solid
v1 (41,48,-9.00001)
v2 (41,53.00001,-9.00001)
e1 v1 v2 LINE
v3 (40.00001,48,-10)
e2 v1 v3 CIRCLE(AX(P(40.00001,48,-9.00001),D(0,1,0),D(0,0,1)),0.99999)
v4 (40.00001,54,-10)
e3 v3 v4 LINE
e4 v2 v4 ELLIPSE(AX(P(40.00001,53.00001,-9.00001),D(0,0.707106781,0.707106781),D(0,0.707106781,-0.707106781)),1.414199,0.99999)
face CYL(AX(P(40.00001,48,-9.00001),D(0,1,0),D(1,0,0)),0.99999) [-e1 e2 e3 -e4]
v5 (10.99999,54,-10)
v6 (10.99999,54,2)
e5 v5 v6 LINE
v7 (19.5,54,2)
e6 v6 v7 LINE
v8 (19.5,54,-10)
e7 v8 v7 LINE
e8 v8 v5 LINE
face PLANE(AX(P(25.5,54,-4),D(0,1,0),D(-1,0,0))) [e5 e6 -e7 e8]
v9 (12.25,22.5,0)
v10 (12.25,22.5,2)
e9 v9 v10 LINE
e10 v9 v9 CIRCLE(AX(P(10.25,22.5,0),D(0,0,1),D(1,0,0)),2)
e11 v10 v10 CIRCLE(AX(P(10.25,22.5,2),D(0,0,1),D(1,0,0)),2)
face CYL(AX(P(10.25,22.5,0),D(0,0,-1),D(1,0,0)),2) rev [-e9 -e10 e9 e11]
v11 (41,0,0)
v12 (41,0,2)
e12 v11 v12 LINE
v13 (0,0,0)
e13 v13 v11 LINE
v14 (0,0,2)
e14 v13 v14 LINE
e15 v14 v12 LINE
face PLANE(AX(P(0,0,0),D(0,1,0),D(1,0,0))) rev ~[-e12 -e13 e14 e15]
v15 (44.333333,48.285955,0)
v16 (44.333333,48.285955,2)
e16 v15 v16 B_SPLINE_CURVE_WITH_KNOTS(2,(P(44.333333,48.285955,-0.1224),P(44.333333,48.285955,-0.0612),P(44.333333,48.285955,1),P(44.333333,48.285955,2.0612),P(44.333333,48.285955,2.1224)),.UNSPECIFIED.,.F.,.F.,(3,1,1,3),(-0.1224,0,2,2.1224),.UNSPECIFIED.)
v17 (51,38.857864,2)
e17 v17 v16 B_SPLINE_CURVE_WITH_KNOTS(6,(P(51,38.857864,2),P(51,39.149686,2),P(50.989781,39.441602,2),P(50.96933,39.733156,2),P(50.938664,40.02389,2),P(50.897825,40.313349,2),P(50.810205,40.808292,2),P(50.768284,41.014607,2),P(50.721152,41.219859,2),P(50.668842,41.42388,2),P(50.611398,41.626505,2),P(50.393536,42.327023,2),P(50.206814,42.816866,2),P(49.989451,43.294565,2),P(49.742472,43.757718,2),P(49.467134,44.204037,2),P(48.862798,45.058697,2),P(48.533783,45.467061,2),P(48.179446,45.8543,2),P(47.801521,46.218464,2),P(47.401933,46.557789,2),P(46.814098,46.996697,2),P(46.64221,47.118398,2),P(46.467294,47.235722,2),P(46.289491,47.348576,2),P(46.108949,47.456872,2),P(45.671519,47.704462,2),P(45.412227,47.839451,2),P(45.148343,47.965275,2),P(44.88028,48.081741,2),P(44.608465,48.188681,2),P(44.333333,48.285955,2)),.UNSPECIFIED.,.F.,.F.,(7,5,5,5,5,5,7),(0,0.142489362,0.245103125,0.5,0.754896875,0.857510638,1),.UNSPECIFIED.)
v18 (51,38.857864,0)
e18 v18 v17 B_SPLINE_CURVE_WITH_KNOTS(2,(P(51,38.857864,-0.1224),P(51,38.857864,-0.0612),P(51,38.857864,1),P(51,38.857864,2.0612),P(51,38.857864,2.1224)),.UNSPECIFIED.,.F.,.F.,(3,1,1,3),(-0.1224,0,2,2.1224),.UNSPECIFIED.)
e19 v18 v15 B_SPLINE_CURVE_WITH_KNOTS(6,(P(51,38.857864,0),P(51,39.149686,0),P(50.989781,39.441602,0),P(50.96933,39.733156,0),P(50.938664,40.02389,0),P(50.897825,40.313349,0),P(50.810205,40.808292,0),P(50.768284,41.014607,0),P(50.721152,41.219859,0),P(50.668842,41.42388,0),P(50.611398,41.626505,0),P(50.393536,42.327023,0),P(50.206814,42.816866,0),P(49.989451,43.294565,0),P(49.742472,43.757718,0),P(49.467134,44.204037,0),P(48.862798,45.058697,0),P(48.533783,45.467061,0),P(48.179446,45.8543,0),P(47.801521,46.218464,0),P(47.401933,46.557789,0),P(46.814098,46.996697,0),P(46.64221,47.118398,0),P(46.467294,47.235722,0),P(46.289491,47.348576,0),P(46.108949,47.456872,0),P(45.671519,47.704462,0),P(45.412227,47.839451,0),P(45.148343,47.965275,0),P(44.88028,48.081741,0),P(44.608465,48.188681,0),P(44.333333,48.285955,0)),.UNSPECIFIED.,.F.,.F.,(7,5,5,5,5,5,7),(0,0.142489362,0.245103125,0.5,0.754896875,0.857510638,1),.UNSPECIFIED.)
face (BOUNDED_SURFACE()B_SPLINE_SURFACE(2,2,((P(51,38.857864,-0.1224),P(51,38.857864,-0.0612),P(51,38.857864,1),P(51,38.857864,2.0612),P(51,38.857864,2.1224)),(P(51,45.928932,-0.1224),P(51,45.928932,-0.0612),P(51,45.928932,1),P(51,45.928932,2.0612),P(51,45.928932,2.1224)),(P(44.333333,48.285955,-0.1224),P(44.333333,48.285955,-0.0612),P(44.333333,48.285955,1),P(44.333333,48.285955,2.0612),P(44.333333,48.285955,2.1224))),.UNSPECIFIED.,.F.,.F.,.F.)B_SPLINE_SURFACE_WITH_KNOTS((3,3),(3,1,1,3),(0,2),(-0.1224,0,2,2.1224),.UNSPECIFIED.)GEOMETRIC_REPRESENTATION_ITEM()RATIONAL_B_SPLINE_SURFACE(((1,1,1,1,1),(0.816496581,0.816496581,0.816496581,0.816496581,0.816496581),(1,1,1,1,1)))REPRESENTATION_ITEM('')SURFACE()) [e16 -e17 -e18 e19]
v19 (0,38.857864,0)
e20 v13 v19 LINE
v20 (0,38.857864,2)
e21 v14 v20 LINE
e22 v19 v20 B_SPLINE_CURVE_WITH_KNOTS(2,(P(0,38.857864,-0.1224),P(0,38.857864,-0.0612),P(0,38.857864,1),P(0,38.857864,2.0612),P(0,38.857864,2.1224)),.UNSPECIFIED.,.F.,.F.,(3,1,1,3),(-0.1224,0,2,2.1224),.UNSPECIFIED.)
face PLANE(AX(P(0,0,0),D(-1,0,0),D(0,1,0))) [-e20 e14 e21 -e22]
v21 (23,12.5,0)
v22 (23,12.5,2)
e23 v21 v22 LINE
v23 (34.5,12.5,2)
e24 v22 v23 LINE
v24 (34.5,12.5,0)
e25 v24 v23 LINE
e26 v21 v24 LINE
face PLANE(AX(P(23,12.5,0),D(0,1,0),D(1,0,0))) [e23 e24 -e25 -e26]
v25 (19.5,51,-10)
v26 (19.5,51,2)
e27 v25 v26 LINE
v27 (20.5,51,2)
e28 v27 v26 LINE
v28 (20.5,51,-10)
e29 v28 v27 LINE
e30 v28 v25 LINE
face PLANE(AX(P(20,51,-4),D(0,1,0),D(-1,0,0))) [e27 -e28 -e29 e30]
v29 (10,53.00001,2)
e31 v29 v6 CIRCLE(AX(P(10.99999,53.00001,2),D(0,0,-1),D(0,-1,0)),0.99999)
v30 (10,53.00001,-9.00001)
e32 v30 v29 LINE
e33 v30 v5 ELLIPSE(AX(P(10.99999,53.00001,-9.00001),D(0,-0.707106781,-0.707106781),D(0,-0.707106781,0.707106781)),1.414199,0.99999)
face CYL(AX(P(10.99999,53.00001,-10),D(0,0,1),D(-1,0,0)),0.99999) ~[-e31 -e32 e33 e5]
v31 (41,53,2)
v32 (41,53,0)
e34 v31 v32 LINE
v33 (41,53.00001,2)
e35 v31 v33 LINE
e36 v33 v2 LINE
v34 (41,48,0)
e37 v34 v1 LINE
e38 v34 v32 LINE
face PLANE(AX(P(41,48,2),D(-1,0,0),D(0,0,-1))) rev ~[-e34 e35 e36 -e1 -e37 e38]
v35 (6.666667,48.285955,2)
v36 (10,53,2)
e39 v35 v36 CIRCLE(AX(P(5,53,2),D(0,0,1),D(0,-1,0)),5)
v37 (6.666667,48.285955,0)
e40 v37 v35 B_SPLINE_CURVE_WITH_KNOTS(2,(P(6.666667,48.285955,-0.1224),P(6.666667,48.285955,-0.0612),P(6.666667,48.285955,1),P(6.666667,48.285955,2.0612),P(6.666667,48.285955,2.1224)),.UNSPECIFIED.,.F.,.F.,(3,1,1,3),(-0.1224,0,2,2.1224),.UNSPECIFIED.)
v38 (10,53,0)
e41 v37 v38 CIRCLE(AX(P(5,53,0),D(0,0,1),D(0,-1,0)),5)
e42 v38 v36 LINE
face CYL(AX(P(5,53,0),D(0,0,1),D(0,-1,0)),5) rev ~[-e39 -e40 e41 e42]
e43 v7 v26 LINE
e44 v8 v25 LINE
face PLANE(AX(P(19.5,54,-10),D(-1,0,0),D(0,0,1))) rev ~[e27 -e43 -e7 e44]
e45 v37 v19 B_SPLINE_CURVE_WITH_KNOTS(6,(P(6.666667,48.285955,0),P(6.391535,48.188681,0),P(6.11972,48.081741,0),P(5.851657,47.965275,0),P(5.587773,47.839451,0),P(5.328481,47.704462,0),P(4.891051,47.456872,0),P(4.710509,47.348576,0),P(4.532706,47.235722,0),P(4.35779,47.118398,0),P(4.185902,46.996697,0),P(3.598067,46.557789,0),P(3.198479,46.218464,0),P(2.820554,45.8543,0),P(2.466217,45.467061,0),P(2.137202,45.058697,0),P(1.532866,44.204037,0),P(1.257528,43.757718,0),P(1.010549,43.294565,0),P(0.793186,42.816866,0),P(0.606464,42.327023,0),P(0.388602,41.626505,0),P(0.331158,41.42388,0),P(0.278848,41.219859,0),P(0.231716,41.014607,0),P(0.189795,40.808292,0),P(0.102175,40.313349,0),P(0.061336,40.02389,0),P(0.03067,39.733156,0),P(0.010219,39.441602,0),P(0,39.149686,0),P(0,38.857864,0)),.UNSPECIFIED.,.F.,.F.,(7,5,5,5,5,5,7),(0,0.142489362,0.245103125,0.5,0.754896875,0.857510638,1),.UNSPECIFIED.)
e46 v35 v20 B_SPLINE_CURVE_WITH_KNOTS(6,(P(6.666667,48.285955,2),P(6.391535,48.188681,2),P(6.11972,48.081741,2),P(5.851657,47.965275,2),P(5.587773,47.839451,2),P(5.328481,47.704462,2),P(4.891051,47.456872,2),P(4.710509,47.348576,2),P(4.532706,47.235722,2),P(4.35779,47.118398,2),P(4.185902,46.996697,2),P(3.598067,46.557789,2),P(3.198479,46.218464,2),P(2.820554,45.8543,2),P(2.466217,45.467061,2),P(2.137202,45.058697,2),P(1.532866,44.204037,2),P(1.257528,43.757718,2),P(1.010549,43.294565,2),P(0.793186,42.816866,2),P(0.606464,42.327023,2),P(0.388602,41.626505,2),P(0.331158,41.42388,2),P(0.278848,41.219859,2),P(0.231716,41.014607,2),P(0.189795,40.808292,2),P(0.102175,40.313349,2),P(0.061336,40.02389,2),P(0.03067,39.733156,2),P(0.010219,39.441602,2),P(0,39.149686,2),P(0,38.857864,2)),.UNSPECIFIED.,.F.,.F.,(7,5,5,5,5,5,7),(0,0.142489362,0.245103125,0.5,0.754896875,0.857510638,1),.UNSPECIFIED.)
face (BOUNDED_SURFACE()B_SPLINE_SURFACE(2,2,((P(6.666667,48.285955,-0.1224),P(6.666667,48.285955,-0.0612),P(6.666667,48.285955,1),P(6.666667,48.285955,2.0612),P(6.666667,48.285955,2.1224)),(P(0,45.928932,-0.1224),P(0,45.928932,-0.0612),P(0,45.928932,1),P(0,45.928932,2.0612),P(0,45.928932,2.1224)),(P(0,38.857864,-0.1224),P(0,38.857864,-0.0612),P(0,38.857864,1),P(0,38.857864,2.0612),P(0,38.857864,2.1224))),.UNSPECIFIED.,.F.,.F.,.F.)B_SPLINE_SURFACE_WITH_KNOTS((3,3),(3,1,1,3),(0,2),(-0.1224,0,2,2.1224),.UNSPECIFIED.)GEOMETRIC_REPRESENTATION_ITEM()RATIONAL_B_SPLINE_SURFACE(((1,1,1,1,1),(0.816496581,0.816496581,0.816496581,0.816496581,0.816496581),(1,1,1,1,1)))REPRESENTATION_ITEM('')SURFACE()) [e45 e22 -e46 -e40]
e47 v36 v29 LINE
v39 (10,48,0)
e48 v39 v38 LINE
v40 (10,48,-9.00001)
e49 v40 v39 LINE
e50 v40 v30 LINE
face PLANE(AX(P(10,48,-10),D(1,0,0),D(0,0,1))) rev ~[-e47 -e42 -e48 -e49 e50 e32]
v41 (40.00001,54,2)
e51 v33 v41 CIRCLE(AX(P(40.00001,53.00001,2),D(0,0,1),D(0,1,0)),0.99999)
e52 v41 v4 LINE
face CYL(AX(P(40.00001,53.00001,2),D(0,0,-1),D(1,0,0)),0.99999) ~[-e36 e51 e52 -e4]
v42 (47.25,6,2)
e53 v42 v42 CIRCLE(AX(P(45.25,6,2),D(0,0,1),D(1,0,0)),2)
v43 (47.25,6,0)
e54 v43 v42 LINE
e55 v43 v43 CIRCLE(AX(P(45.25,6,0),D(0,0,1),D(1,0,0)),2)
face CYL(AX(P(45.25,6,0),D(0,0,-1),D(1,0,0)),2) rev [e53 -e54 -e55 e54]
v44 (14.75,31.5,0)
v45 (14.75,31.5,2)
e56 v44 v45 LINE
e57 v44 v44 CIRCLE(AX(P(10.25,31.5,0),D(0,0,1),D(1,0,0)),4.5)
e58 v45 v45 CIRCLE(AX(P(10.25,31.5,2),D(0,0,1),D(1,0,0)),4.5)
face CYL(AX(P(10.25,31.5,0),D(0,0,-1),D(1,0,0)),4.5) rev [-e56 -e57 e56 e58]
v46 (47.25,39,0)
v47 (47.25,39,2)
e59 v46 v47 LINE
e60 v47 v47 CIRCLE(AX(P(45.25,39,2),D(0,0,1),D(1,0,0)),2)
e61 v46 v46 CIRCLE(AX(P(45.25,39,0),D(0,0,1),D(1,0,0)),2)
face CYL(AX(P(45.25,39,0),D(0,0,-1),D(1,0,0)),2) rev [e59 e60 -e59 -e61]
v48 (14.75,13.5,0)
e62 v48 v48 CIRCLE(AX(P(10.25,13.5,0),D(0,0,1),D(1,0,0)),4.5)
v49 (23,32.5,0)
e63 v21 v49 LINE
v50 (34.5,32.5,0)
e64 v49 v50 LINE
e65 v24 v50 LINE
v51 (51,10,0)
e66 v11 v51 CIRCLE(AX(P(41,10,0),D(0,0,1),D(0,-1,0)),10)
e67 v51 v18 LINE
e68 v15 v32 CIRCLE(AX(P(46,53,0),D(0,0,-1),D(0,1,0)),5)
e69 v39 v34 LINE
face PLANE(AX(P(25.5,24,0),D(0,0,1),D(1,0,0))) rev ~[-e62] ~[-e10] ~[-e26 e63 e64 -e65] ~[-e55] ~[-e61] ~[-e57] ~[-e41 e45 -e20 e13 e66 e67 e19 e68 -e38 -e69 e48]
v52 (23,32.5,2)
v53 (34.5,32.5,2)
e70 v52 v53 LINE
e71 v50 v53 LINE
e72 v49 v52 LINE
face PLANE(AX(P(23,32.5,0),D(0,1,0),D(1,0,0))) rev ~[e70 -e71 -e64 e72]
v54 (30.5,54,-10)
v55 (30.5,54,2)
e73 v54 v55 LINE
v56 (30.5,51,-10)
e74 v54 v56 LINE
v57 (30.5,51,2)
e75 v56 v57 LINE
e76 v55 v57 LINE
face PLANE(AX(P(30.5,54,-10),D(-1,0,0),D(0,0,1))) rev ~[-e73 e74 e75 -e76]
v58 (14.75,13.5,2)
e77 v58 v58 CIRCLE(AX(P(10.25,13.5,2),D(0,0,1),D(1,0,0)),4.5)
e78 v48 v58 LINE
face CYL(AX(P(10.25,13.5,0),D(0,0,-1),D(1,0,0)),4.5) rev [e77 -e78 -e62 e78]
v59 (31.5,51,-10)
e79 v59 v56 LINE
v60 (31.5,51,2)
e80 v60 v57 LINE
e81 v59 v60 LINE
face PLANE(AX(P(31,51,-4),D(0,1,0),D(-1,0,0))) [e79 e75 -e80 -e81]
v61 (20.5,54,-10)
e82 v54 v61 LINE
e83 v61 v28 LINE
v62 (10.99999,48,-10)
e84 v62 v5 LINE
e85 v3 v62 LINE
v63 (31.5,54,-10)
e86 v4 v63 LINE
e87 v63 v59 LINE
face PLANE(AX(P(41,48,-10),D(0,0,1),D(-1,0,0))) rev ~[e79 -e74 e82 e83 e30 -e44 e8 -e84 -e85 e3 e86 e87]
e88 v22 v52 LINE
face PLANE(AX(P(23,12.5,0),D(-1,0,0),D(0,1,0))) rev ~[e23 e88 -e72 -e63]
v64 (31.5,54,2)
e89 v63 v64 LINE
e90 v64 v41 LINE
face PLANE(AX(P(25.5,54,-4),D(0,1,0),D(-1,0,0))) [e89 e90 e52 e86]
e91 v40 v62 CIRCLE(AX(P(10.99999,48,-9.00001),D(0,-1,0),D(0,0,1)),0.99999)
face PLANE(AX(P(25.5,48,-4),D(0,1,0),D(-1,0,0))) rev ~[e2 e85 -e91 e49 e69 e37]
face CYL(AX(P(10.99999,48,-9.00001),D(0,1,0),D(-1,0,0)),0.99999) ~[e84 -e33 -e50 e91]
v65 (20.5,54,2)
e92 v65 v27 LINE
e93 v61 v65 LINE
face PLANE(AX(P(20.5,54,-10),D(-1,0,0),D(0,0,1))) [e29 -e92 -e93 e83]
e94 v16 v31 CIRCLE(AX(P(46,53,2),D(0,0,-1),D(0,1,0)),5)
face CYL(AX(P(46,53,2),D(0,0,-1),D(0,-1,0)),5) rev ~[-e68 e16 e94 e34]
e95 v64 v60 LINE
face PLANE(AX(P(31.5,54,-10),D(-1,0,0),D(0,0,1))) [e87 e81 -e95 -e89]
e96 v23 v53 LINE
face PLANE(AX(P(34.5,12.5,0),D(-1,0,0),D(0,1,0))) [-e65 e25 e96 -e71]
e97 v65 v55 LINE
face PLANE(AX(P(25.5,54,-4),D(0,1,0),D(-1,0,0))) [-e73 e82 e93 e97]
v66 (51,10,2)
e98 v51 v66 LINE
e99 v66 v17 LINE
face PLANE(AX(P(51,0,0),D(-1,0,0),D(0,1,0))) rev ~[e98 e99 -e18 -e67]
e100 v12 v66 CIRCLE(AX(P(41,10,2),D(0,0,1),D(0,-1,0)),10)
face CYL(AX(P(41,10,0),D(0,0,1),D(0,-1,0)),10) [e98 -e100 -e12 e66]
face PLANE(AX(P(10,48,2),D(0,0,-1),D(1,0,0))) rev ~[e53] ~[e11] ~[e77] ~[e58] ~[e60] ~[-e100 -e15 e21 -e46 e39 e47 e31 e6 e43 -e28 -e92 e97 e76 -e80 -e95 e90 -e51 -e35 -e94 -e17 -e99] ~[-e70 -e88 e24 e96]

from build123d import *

# Parameters (mm, degrees)
F0_W     = 51
F0_H     = 48
F0_R     = 4.5
F0_R_2   = 2
F0_W_2   = 11.5
F0_H_2   = 20
F1_DEPTH = 2
F3_DEPTH = 6
F4_W     = 1
F4_H     = 12
F5_DEPTH = 3
F6_R     = 5
F7_R     = 0.99999
F8_R     = 10


# Not quite as in the source:
# - a fillet or chamfer is up to 0.001 mm smaller than in the source, because OpenCascade refuses the exact size


with BuildPart() as f1:
    # F0 (on Top) → F1 (new body)
    with BuildSketch(Plane.XY):
        with Locations((25.5, 24)):
            Rectangle(F0_W, F0_H)
        with Locations((10.25, 13.5)):
            Circle(F0_R, mode=Mode.SUBTRACT)
        with Locations((10.25, 22.5)):
            Circle(F0_R_2, mode=Mode.SUBTRACT)
        with Locations((45.25, 6)):
            Circle(F0_R_2, mode=Mode.SUBTRACT)
        with Locations((28.75, 22.5)):
            Rectangle(F0_W_2, F0_H_2, mode=Mode.SUBTRACT)
        with Locations((10.25, 31.5)):
            Circle(F0_R, mode=Mode.SUBTRACT)
        with Locations((45.25, 39)):
            Circle(F0_R_2, mode=Mode.SUBTRACT)
    extrude(amount=F1_DEPTH)

    # F2 (on face) → F3 (join)
    with BuildSketch(Plane(origin=(0, 48, 0), x_dir=(-1, 0, 0), z_dir=(0, 1, 0))):
        Polygon((-10, 2), (-41, 2), (-41, 0), (-41, -10), (-10, -10), (-10, 0), align=None)
    extrude(amount=F3_DEPTH)

    # F4 (on face) → F5 (cut)
    with BuildSketch(Plane(origin=(0, 54, 0), x_dir=(-1, 0, 0), z_dir=(0, 1, 0))):
        with Locations((-20, -4)):
            Rectangle(F4_W, F4_H)
        with Locations((-31, -4)):
            Rectangle(F4_W, F4_H)
    extrude(amount=-F5_DEPTH, mode=Mode.SUBTRACT)

    # F6
    f6_edges = [f1.edges().sort_by_distance(p)[0] for p in [
        (10, 48, 1),
        (41, 48, 1),
    ]]
    fillet(f6_edges, radius=F6_R)

    # F7 (radius 1 in the source; OpenCascade refuses exactly that, so slightly less here)
    f7_edges = [f1.edges().sort_by_distance(p)[0] for p in [
        (41, 54, -4),
        (10, 54, -4),
        (10, 51, -10),
        (41, 51, -10),
    ]]
    fillet(f7_edges, radius=F7_R)

    # F8
    f8_edges = [f1.edges().sort_by_distance(p)[0] for p in [
        (51, 48, 1),
        (0, 48, 1),
        (51, 0, 1),
    ]]
    fillet(f8_edges, radius=F8_R)


solid = f1.part
